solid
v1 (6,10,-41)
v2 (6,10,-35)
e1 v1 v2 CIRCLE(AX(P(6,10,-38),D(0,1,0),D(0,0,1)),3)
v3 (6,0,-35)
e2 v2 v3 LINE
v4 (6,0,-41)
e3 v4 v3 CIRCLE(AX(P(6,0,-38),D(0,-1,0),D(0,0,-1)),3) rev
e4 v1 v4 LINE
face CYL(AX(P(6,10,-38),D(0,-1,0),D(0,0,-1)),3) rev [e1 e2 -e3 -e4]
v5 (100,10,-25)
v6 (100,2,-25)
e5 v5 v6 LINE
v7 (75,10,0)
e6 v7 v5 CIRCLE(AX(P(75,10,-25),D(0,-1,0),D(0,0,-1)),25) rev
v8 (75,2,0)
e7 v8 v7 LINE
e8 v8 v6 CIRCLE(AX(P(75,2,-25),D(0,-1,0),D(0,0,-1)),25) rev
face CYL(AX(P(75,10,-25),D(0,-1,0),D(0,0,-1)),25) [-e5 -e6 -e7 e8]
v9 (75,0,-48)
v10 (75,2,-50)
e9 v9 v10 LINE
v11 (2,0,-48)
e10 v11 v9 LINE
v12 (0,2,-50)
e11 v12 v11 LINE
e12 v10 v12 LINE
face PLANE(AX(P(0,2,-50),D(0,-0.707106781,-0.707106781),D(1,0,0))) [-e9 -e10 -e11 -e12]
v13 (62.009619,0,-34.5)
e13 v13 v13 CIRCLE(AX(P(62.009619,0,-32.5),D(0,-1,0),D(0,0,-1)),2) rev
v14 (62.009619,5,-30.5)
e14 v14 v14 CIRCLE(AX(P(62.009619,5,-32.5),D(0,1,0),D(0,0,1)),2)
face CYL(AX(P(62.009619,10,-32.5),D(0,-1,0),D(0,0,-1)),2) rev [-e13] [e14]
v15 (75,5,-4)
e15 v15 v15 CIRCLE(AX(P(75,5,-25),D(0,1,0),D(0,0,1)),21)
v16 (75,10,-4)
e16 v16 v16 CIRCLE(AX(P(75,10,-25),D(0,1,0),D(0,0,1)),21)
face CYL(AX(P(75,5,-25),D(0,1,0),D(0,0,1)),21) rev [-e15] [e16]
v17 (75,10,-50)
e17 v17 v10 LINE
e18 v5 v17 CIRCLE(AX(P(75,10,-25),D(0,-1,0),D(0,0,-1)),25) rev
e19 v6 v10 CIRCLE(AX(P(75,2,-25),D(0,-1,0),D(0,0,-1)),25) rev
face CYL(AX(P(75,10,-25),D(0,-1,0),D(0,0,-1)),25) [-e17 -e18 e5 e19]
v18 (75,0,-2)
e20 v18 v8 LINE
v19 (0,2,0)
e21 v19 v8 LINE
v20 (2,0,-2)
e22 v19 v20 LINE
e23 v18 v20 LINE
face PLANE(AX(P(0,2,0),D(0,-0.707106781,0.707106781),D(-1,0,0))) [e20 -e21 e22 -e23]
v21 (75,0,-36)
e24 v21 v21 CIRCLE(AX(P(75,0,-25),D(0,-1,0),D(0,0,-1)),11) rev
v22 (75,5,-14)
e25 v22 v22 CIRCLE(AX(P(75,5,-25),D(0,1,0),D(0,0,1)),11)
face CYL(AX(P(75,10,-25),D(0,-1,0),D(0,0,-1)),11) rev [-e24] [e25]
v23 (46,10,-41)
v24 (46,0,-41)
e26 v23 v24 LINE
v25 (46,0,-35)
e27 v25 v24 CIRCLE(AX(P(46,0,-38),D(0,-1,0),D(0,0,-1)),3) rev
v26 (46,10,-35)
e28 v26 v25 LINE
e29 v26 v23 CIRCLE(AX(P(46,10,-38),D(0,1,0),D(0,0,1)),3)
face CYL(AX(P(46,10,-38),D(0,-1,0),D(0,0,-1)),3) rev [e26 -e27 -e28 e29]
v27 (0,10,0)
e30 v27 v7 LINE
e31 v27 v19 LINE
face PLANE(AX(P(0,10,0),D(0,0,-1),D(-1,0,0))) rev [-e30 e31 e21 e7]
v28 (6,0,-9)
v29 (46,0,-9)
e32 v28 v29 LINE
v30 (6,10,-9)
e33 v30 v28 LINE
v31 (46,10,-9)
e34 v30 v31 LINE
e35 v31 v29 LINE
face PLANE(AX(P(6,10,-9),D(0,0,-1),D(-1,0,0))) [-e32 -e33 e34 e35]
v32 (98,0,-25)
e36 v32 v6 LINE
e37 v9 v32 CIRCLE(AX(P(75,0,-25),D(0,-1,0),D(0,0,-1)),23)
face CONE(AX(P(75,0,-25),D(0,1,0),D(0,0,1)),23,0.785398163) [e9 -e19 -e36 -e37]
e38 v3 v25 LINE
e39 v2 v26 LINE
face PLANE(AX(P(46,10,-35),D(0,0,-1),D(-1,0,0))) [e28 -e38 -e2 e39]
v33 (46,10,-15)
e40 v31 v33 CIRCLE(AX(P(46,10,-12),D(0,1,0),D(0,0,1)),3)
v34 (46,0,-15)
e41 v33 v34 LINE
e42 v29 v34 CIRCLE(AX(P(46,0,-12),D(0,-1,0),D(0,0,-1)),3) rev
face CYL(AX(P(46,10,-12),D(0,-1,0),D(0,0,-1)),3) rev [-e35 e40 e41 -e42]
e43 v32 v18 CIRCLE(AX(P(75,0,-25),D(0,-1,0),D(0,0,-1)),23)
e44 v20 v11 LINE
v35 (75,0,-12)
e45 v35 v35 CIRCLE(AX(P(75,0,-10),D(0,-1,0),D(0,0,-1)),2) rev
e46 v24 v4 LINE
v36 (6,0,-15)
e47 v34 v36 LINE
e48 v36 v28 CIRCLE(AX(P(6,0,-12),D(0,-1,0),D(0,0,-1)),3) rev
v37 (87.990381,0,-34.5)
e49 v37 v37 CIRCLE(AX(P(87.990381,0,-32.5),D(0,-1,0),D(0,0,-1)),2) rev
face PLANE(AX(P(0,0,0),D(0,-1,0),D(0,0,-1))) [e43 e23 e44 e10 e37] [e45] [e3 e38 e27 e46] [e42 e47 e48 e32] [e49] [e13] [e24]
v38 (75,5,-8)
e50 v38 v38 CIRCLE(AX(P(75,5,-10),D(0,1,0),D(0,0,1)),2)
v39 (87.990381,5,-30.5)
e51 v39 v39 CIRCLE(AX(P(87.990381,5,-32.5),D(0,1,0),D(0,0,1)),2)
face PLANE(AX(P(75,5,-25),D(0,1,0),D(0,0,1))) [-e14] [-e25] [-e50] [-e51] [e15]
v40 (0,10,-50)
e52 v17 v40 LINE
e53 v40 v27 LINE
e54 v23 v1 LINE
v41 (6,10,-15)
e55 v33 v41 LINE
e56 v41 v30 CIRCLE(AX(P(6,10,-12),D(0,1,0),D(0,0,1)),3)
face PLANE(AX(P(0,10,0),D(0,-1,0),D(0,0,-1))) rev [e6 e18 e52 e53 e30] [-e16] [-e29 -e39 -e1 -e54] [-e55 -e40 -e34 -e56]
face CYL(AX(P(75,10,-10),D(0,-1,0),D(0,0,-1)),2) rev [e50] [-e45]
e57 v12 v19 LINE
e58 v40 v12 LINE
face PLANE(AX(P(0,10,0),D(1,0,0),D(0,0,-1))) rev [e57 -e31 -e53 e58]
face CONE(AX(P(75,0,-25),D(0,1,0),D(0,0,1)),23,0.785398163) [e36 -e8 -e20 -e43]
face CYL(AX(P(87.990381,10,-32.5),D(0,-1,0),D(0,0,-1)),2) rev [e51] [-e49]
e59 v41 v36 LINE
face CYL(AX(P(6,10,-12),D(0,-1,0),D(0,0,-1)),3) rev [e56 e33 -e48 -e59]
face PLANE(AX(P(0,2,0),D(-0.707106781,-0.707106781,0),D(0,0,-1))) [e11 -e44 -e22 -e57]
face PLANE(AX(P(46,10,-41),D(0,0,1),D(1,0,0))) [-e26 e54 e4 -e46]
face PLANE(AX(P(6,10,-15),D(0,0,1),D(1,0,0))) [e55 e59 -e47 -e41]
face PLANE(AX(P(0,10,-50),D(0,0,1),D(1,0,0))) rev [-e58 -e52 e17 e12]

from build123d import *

# Parameters (mm, degrees)
SKETCH1_W               = 100
SKETCH1_H               = 50
BOSS_EXTRUDE1_DEPTH     = 10
FILLET1_R               = 25
CUT_EXTRUDE1_DEPTH      = 113.249721603
CUT_EXTRUDE1_DEPTH_BACK = 113.249721603
SKETCH2_R               = 11
SKETCH2_R_2             = 2
SKETCH3_R               = 21
CUT_EXTRUDE2_DEPTH      = 5
CUT_EXTRUDE3_DEPTH      = 113.249721603
CUT_EXTRUDE3_DEPTH_BACK = 113.249721603
CHAMFER1_SIZE           = 2


with BuildPart() as part:
    # Sketch1 → Boss-Extrude1 (new body)
    with BuildSketch(Plane(origin=(0, 0, 0), x_dir=(1, 0, 0), z_dir=(0, 1, 0))):
        with Locations((50, 25)):
            Rectangle(SKETCH1_W, SKETCH1_H)
    extrude(amount=BOSS_EXTRUDE1_DEPTH)

    # Fillet1
    fillet1_edges = [part.edges().sort_by_distance(p)[0] for p in [
        (100, 5, -50),
        (100, 5, 0),
    ]]
    fillet(fillet1_edges, radius=FILLET1_R - 0.0001)  # a hair under: the kernel refuses the full size

    # Sketch2 → Cut-Extrude1 (cut, two sides: drawn at the far end of the back side and taken through both)
    with BuildSketch(Plane(origin=(0, 0, 0), x_dir=(1, 0, 0), z_dir=(0, 1, 0)).offset(-CUT_EXTRUDE1_DEPTH_BACK)):
        with Locations(Location((75, 25, 0), (0, 0, 90))):
            Circle(SKETCH2_R)
        with Locations(Location((75, 10, 0), (0, 0, 90))):
            Circle(SKETCH2_R_2)
        with Locations(Location((62.009618943, 32.5, 0), (0, 0, 90))):
            Circle(SKETCH2_R_2)
        with Locations(Location((87.990381057, 32.5, 0), (0, 0, 90))):
            Circle(SKETCH2_R_2)
    extrude(amount=CUT_EXTRUDE1_DEPTH + CUT_EXTRUDE1_DEPTH_BACK, mode=Mode.SUBTRACT)

    # Sketch3 → Cut-Extrude2 (cut)
    with BuildSketch(Plane(origin=(0, 10, 0), x_dir=(1, 0, 0), z_dir=(0, 1, 0))):
        with Locations(Location((75, 25, 0), (0, 0, 270))):
            Circle(SKETCH3_R)
    extrude(amount=-CUT_EXTRUDE2_DEPTH, mode=Mode.SUBTRACT)

    # Sketch4 → Cut-Extrude3 (cut, two sides: drawn at the far end of the back side and taken through both)
    with BuildSketch(Plane(origin=(0, 0, 0), x_dir=(1, 0, 0), z_dir=(0, 1, 0)).offset(-CUT_EXTRUDE3_DEPTH_BACK)):
        with BuildLine():
            Line((6, 15), (46, 15))
            ThreePointArc((46, 15), (49, 12), (46, 9))
            Line((46, 9), (6, 9))
            ThreePointArc((6, 9), (3, 12), (6, 15))
        make_face()
        with BuildLine():
            Line((46, 35), (6, 35))
            ThreePointArc((6, 35), (3, 38), (6, 41))
            Line((6, 41), (46, 41))
            ThreePointArc((46, 41), (49, 38), (46, 35))
        make_face()
    extrude(amount=CUT_EXTRUDE3_DEPTH + CUT_EXTRUDE3_DEPTH_BACK, mode=Mode.SUBTRACT)

    # Chamfer1
    chamfer1_edges = [part.edges().sort_by_distance(p)[0] for p in [
        (37.50005, 0, -50),
        (92.677698819, 0, -7.322301181),
        (92.677698819, 0, -42.677698819),
        (37.50005, 0, 0),
        (0, 0, -25),
    ]]
    chamfer(chamfer1_edges, length=CHAMFER1_SIZE)


solid = part.part
